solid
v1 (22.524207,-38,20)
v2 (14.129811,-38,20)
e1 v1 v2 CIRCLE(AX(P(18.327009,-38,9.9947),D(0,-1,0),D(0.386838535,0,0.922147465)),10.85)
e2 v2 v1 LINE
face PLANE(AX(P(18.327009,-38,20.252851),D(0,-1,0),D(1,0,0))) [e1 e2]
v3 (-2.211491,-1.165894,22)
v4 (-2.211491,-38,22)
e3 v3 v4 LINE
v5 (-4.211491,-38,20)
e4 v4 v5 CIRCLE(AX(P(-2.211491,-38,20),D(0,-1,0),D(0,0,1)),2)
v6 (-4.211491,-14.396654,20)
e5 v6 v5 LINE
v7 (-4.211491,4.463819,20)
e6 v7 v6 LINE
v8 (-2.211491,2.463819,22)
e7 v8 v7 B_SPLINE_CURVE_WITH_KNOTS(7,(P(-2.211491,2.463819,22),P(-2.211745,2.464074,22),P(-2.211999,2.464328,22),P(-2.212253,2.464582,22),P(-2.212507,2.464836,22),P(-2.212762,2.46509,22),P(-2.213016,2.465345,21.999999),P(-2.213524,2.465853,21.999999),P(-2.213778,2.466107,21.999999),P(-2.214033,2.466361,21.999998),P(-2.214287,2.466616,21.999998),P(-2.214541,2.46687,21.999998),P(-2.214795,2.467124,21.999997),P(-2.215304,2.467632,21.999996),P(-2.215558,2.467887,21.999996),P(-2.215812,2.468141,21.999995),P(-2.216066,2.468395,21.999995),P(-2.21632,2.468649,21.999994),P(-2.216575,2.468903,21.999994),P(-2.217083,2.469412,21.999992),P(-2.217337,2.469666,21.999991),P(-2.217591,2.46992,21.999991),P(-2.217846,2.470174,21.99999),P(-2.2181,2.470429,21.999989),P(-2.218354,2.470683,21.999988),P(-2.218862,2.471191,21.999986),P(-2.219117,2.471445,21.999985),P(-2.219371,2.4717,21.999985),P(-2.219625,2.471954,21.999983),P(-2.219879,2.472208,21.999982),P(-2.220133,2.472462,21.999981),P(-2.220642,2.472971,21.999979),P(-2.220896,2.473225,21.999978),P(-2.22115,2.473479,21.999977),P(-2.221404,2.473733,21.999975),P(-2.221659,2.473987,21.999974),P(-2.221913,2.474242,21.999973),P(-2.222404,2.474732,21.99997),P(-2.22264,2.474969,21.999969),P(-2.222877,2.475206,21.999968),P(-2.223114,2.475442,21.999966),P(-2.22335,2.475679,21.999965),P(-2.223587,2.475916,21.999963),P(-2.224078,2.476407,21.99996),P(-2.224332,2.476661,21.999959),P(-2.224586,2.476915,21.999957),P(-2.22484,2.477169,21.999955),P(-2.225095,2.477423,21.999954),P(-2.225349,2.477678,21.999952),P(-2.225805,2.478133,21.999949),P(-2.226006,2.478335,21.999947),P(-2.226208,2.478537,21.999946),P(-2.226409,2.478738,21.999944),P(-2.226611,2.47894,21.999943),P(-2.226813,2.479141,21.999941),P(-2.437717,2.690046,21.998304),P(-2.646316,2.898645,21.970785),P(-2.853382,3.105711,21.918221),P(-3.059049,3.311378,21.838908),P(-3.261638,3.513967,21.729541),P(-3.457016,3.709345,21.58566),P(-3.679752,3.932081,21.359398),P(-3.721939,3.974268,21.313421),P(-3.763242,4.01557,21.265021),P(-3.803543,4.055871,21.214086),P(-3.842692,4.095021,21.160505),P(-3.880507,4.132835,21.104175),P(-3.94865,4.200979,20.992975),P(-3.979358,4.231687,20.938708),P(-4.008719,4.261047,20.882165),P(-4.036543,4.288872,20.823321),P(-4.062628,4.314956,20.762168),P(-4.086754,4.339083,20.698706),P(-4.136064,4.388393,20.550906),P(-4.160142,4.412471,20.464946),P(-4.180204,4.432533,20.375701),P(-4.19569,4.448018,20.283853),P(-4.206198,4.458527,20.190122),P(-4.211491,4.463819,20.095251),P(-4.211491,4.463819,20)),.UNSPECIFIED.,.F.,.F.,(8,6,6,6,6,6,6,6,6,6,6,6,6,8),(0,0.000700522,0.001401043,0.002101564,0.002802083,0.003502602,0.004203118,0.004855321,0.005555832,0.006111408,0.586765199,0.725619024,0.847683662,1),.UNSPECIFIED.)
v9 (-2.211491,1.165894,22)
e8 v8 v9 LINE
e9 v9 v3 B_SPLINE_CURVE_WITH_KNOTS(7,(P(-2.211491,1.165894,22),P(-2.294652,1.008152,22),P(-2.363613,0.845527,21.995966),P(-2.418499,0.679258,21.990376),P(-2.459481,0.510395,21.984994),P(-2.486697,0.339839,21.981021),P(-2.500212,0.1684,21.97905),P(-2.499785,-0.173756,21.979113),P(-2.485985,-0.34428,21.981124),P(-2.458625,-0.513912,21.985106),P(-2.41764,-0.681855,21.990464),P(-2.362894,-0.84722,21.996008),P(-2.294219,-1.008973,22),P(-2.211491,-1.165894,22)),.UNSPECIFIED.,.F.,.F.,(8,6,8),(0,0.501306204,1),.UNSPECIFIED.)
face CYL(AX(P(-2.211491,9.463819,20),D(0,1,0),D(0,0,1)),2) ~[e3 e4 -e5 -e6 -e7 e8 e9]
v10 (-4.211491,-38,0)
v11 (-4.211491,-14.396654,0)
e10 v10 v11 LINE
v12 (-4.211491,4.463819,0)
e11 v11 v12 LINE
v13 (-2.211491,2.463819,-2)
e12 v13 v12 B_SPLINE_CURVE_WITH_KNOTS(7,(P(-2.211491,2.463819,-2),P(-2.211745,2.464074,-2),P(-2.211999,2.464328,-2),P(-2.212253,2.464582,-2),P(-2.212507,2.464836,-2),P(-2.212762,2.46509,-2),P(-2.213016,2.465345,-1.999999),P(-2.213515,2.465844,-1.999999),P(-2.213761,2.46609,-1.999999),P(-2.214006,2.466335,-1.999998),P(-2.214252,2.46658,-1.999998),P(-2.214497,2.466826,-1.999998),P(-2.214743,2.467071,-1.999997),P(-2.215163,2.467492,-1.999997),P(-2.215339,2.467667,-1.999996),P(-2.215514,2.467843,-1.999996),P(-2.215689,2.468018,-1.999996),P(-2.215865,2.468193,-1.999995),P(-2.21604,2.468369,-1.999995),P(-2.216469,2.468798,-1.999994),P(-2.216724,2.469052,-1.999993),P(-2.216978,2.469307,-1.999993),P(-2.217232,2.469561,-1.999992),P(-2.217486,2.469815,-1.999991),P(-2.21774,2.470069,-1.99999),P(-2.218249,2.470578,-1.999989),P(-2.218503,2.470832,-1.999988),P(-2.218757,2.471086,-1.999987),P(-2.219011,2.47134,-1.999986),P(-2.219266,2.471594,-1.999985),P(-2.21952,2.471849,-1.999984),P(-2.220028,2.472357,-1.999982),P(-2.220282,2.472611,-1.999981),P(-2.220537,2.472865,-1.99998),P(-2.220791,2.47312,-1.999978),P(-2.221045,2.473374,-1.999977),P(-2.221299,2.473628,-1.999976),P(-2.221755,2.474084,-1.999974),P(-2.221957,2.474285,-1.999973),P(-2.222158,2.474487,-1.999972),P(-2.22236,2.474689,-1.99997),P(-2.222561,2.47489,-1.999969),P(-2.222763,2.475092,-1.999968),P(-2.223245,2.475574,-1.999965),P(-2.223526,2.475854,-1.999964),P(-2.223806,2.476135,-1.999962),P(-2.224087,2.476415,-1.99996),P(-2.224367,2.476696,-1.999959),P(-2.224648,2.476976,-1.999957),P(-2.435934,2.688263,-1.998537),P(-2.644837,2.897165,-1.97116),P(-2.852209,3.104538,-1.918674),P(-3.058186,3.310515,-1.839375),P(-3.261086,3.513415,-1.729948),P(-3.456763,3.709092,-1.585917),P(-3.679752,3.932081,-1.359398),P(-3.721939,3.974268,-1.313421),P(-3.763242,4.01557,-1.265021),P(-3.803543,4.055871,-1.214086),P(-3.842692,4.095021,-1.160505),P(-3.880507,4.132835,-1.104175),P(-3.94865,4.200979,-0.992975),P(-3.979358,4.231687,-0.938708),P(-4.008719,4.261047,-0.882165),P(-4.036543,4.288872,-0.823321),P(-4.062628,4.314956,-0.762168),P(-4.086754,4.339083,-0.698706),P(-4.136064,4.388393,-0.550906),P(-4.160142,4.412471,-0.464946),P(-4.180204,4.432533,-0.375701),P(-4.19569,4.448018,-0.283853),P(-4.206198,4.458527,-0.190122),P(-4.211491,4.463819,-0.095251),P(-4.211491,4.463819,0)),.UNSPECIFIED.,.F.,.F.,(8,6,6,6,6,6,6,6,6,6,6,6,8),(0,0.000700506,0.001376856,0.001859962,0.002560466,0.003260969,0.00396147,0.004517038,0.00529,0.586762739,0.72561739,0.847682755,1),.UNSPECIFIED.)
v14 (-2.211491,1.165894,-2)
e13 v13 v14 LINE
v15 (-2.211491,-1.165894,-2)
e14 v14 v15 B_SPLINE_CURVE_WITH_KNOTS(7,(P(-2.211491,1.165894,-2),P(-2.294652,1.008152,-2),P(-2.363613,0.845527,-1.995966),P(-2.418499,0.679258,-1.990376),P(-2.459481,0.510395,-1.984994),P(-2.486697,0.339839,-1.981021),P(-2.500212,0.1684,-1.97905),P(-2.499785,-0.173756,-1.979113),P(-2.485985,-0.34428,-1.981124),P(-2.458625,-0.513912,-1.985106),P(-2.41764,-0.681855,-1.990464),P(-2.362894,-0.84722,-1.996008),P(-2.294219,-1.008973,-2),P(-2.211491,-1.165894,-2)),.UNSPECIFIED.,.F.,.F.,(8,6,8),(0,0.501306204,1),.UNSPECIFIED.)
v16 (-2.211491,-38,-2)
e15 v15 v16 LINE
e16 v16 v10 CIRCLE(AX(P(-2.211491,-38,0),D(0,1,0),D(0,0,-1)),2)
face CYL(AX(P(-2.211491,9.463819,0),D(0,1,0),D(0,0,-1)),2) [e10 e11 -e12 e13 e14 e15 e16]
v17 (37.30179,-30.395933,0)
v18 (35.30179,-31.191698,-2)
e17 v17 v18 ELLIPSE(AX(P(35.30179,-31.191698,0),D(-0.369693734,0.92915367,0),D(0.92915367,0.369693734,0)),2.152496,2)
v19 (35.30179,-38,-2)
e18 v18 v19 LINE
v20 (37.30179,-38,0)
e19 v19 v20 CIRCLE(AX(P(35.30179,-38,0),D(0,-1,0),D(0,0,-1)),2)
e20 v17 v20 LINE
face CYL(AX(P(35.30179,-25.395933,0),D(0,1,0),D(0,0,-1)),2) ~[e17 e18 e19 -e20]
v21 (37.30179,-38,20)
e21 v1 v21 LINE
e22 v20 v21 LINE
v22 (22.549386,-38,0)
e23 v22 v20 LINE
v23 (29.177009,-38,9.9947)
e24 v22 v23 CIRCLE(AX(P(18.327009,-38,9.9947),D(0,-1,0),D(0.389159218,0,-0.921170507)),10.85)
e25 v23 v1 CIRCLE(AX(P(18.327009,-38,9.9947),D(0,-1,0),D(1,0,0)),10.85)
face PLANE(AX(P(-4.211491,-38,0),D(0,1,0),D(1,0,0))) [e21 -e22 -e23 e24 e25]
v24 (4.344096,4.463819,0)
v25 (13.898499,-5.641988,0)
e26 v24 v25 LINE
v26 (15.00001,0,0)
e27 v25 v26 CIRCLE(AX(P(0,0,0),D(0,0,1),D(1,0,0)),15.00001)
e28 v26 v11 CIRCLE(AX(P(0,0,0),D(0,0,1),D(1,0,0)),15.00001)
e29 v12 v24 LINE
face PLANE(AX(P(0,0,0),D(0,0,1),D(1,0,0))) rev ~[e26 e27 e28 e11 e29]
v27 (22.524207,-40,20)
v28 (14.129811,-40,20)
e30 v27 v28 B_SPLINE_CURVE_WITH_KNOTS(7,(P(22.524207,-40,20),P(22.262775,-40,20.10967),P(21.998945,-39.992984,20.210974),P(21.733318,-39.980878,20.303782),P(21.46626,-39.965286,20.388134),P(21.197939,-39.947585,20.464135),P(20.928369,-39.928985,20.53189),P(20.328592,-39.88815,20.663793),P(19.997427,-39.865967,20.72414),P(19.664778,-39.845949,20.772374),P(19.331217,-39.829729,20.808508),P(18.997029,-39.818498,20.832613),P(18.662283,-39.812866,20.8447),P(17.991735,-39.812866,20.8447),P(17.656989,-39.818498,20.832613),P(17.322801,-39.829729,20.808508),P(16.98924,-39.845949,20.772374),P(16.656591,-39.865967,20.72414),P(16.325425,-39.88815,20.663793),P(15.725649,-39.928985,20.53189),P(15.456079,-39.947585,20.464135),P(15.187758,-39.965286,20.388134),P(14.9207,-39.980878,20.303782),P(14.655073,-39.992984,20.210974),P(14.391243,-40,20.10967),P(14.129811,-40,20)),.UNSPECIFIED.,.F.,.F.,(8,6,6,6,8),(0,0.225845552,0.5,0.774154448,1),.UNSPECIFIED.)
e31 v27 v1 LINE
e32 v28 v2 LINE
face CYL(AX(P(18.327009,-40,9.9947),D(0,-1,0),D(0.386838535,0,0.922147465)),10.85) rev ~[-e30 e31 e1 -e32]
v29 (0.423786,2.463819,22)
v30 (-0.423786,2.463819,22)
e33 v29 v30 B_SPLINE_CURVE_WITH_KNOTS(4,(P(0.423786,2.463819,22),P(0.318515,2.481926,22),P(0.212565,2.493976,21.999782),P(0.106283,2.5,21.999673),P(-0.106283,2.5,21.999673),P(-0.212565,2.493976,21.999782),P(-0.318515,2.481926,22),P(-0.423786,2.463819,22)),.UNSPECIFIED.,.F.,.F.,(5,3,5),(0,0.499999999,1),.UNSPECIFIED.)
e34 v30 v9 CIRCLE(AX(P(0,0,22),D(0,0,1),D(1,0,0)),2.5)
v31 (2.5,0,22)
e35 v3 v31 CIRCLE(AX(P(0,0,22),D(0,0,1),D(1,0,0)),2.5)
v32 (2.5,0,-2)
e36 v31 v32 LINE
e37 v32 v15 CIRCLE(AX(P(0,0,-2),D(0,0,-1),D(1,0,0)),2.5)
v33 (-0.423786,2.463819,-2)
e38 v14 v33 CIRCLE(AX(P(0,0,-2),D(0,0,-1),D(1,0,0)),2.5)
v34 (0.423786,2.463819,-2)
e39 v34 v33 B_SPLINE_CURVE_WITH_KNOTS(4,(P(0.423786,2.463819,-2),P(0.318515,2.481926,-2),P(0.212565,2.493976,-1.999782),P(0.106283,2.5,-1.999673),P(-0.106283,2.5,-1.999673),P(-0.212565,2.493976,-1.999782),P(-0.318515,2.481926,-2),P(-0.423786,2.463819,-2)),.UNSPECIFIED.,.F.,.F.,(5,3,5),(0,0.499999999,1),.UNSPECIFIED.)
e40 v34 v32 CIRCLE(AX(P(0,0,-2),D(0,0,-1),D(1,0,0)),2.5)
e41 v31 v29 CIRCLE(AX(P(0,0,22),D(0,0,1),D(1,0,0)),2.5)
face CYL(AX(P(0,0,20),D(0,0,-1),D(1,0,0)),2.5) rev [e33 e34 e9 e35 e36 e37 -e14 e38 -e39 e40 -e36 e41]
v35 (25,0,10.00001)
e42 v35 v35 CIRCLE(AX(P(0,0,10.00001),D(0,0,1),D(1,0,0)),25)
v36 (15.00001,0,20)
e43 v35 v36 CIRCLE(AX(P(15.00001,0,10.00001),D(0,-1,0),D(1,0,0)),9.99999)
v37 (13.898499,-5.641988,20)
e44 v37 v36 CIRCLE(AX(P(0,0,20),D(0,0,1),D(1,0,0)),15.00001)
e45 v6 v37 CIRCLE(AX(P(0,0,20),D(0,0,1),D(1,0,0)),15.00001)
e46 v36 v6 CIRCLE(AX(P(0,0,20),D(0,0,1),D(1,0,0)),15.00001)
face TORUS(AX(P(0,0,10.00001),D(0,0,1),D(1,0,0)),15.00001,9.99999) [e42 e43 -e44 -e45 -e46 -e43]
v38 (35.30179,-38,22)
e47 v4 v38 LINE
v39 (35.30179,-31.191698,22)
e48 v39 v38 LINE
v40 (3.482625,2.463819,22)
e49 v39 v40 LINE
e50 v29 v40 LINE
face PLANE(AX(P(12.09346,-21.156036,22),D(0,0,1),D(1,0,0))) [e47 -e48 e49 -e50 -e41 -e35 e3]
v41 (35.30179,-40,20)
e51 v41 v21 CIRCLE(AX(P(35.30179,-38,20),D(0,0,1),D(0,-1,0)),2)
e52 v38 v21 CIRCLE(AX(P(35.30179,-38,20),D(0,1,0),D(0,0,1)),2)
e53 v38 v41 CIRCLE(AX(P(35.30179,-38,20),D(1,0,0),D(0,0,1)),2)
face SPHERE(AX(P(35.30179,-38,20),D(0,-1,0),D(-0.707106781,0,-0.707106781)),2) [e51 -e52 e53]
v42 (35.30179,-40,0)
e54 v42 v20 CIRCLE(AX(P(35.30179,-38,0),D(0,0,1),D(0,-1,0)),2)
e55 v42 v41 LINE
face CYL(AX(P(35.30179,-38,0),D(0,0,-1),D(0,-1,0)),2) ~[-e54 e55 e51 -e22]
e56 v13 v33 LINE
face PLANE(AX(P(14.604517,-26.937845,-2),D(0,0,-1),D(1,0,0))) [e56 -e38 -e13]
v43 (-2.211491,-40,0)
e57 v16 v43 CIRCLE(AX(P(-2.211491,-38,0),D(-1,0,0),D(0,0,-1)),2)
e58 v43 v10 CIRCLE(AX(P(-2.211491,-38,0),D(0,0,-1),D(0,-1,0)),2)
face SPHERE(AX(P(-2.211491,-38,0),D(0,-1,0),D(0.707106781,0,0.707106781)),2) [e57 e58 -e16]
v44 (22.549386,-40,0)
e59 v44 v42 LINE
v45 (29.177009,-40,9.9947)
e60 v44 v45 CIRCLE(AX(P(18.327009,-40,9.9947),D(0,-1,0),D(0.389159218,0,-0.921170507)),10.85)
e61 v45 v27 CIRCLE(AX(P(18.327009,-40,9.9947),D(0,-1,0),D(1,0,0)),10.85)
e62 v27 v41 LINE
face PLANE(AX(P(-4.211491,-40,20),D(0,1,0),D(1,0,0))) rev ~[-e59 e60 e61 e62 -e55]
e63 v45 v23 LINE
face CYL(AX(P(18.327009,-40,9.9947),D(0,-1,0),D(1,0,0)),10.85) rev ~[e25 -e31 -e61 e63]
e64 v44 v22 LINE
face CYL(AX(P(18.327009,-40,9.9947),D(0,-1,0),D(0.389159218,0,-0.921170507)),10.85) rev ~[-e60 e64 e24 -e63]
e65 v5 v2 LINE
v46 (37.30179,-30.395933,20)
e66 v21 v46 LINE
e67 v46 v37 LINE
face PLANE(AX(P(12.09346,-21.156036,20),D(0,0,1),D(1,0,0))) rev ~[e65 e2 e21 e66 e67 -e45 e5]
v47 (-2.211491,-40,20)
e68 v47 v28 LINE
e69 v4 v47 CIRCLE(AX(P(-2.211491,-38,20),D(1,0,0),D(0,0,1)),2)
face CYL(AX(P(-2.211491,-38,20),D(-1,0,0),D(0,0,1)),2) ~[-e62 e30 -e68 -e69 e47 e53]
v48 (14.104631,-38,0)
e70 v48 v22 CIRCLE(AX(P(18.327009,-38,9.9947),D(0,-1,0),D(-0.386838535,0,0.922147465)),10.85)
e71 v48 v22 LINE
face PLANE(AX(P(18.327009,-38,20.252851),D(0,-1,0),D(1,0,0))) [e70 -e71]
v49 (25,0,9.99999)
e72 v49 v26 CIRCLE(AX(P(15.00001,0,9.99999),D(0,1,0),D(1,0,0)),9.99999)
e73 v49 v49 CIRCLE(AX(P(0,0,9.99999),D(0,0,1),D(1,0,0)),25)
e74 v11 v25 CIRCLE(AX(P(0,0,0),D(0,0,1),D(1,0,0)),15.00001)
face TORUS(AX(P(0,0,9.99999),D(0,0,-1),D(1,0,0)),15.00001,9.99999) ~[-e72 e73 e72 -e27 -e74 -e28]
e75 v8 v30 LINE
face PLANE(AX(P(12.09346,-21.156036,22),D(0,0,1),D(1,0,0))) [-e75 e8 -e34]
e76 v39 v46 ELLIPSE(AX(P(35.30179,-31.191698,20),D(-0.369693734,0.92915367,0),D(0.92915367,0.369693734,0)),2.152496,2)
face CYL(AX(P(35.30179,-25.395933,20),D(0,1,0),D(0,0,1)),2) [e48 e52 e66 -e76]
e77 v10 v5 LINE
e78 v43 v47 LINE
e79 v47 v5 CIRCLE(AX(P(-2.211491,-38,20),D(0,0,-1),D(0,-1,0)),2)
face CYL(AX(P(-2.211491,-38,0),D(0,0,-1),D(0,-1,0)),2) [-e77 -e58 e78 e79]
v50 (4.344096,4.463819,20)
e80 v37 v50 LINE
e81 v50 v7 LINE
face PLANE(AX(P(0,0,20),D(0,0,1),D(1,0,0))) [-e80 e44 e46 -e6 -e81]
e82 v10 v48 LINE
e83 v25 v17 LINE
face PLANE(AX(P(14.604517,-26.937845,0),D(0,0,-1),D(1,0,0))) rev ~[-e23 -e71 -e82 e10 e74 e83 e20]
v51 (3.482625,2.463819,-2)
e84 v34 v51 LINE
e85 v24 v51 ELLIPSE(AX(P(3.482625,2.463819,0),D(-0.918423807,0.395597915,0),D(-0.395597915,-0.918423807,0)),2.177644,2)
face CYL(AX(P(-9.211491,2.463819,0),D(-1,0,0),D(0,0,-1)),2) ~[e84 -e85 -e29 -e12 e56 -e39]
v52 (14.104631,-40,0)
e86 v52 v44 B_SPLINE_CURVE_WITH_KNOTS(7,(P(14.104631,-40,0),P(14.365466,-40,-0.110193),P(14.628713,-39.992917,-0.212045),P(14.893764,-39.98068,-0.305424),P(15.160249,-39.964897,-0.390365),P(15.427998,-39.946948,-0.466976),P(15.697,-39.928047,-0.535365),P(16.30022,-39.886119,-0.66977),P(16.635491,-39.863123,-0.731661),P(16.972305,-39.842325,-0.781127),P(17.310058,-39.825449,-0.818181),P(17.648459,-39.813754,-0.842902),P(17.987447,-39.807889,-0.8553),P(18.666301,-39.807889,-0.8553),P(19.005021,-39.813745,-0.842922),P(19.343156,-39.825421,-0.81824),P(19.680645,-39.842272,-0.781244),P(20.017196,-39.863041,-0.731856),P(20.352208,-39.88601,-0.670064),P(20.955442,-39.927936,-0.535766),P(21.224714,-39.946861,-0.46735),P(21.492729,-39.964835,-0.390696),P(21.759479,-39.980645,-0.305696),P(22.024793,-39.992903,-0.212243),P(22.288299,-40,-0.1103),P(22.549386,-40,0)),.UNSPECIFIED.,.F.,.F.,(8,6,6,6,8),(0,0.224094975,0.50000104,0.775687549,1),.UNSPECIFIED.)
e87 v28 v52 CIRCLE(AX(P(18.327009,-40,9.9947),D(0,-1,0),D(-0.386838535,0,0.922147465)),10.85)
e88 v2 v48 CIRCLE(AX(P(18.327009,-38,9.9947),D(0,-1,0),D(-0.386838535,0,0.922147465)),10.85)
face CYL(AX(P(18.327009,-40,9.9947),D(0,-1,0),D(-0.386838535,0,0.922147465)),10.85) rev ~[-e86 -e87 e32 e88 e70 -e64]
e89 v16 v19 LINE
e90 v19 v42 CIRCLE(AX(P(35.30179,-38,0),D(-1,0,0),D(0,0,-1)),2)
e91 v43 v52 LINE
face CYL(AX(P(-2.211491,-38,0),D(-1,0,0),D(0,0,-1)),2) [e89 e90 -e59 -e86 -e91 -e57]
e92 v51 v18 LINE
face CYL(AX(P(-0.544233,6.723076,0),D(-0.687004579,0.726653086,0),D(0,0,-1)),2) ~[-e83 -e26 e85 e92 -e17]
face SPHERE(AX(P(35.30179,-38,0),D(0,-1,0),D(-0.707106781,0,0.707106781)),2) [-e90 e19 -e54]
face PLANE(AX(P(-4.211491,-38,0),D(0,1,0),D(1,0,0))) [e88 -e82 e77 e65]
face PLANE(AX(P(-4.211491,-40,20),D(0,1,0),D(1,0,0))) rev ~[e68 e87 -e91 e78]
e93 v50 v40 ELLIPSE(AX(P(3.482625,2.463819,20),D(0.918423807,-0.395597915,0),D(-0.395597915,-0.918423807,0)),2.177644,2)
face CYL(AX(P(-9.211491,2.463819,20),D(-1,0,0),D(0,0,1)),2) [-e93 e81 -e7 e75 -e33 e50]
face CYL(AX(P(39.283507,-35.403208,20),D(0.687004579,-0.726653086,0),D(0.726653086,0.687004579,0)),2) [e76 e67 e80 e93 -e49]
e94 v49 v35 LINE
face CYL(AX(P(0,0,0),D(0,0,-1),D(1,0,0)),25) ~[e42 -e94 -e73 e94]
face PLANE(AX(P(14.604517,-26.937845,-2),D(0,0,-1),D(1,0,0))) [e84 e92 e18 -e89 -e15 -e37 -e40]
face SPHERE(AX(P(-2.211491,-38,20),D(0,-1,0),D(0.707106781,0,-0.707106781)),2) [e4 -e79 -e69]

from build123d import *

# Parameters (mm, degrees)
F0_R          = 25
F1_DEPTH      = 20
F2_R          = 9.99999
F3_R          = 2.5
F4_DEPTH      = 25.4
F5_R          = 2.5
F6_DEPTH      = 2
F7_W          = 41.5132804774
F7_H          = 2
F8_DEPTH      = 20
F9_R          = 2.5
F9_W          = 41.5132804774
F9_H          = 2
F10_DEPTH     = 2
F11_T1_DEPTH  = 20
F11_T3_DEPTH  = 47.4638193212
F11_T5_DEPTH  = 37.5132804774
F11_T7_DEPTH  = 12.6040666103
F11_T9_DEPTH  = 57.9730332998
F11_T11_DEPTH = 18.5555869155
F11_T13_DEPTH = 57.9730332998
F11_S17_W     = 2
F11_S17_H     = 2
F11_T18_DEPTH = 2
F11_S23_W     = 2
F11_S23_H     = 2
F11_T24_DEPTH = 2
F11_S29_W     = 2
F11_S29_H     = 2
F11_T30_DEPTH = 2
F11_S35_W     = 2
F11_S35_H     = 2
F11_T36_DEPTH = 2
F13_DEPTH     = 2


# Not quite as in the source:
# - a fillet or chamfer that OpenCascade refuses, or shapes differently, is made with other operations: its cross-section is extruded or revolved along the edge and cut away or added
# - a fillet or chamfer is up to 0.001 mm smaller than in the source, because OpenCascade refuses the exact size


with BuildPart() as f1:
    # F0 (on Top) → F1 (new body)
    with BuildSketch(Plane.XY):
        Circle(F0_R)
    extrude(amount=F1_DEPTH)

    # F2 (radius 10 in the source; OpenCascade refuses exactly that, so slightly less here)
    f2_edges = [f1.edges().sort_by_distance(p)[0] for p in [
        (-25, 0, 20),
        (-25, 0, 0),
    ]]
    fillet(f2_edges, radius=F2_R)

    # F3 (on face) → F4 (cut)
    with BuildSketch(Plane.XY.offset(20)):
        Circle(F3_R)
    extrude(amount=-F4_DEPTH, mode=Mode.SUBTRACT)

    # F5 (on face) → F6 (join)
    with BuildSketch(Plane(origin=(0, 0, 0), x_dir=(1, 0, 0), z_dir=(0, 0, -1))):
        with BuildLine():
            Line((37.3017899692, 30.3959333897), (37.3017899692, 40))
            Line((37.3017899692, 40), (-4.2114905082, 40))
            Line((-4.2114905082, 40), (-4.2114905082, 14.3966540453))
            ThreePointArc((-4.2114905082, 14.3966540453), (6.5284436355, 13.5048037268), (13.8984988304, 5.641988148))
            Line((13.8984988304, 5.641988148), (37.3017899692, 30.3959333897))
        make_face()
        with BuildLine():
            Line((4.3440964073, -4.4638193212), (13.8984988304, 5.641988148))
            ThreePointArc((13.8984988304, 5.641988148), (6.5284436355, 13.5048037268), (-4.2114905082, 14.3966540453))
            Line((-4.2114905082, 14.3966540453), (-4.2114905082, -4.4638193212))
            Line((-4.2114905082, -4.4638193212), (4.3440964073, -4.4638193212))
        make_face()
        Circle(F5_R, mode=Mode.SUBTRACT)
    extrude(amount=F6_DEPTH)

    # F7 (on face) → F8 (join)
    with BuildSketch(Plane.XY):
        with Locations((16.5451497305, -39)):
            Rectangle(F7_W, F7_H)
    extrude(amount=F8_DEPTH)

    # F9 (on face) → F10 (join)
    with BuildSketch(Plane.XY.offset(20)):
        Polygon((37.3017899692, -38), (37.3017899692, -30.3959333897), (4.3440964073, 4.4638193212), (-4.2114905082, 4.4638193212), (-4.2114905082, -38), align=None)
        Circle(F9_R, mode=Mode.SUBTRACT)
        with Locations((16.5451497305, -39)):
            Rectangle(F9_W, F9_H)
    extrude(amount=F10_DEPTH)

    # F11: fillet of radius 2 on 12 edges, made by hand

    # F11_s2 → F11_t1 (cut)
    with BuildSketch(Plane.XY):
        with BuildLine():
            ThreePointArc((-2.2114905082, -40), (-3.6257040705, -39.4142135624), (-4.2114905082, -38))
            Line((-4.2114905082, -38), (-4.2114905082, -40))
            Line((-4.2114905082, -40), (-2.2114905082, -40))
        make_face()
        with BuildLine():
            ThreePointArc((35.3017899692, -40), (36.7160035316, -39.4142135624), (37.3017899692, -38))
            Line((37.3017899692, -38), (37.3017899692, -40))
            Line((37.3017899692, -40), (35.3017899692, -40))
        make_face()
    extrude(amount=F11_T1_DEPTH, mode=Mode.SUBTRACT)

    # F11_s4 → F11_t3 (cut)
    with BuildSketch(Plane.XZ.offset(-9.4638193212)):
        with BuildLine():
            ThreePointArc((-2.2114905082, 22), (-3.6257040705, 21.4142135624), (-4.2114905082, 20))
            Line((-4.2114905082, 20), (-4.2114905082, 22))
            Line((-4.2114905082, 22), (-2.2114905082, 22))
        make_face()
        with BuildLine():
            ThreePointArc((-2.2114905082, -2), (-3.6257040705, -1.4142135624), (-4.2114905082, 0))
            Line((-4.2114905082, 0), (-4.2114905082, -2))
            Line((-4.2114905082, -2), (-2.2114905082, -2))
        make_face()
    extrude(amount=F11_T3_DEPTH, mode=Mode.SUBTRACT)

    # F11_s6 → F11_t5 (cut)
    with BuildSketch(Plane.YZ.offset(-2.2114905082)):
        with BuildLine():
            ThreePointArc((-38, 22), (-39.4142135624, 21.4142135624), (-40, 20))
            Line((-40, 20), (-40, 22))
            Line((-40, 22), (-38, 22))
        make_face()
        with BuildLine():
            ThreePointArc((-38, -2), (-39.4142135624, -1.4142135624), (-40, 0))
            Line((-40, 0), (-40, -2))
            Line((-40, -2), (-38, -2))
        make_face()
    extrude(amount=F11_T5_DEPTH, mode=Mode.SUBTRACT)

    # F11_s8 → F11_t7 (cut)
    with BuildSketch(Plane.XZ.offset(25.3959333897)):
        with BuildLine():
            ThreePointArc((35.3017899692, 22), (36.7160035316, 21.4142135624), (37.3017899692, 20))
            Line((37.3017899692, 20), (37.3017899692, 22))
            Line((37.3017899692, 22), (35.3017899692, 22))
        make_face()
        with BuildLine():
            ThreePointArc((35.3017899692, -2), (36.7160035316, -1.4142135624), (37.3017899692, 0))
            Line((37.3017899692, 0), (37.3017899692, -2))
            Line((37.3017899692, -2), (35.3017899692, -2))
        make_face()
    extrude(amount=F11_T7_DEPTH, mode=Mode.SUBTRACT)

    # F11_s10 → F11_t9 (cut)
    with BuildSketch(Plane(origin=(36.2146215396, -38.3046449843, 0), x_dir=(0, 0, 1), z_dir=(-0.6870045793, 0.7266530864, 0))):
        with BuildLine():
            ThreePointArc((20, 6.223315377), (21.4142135624, 5.6375289394), (22, 4.223315377))
            Line((22, 4.223315377), (22, 6.223315377))
            Line((22, 6.223315377), (20, 6.223315377))
        make_face()
    extrude(amount=F11_T9_DEPTH, mode=Mode.SUBTRACT)

    # F11_s12 → F11_t11 (cut)
    with BuildSketch(Plane.YZ.offset(-9.2114905082)):
        with BuildLine():
            ThreePointArc((2.4638193212, 22), (3.8780328836, 21.4142135624), (4.4638193212, 20))
            Line((4.4638193212, 20), (4.4638193212, 22))
            Line((4.4638193212, 22), (2.4638193212, 22))
        make_face()
        with BuildLine():
            ThreePointArc((2.4638193212, -2), (3.8780328836, -1.4142135624), (4.4638193212, 0))
            Line((4.4638193212, 0), (4.4638193212, -2))
            Line((4.4638193212, -2), (2.4638193212, -2))
        make_face()
    extrude(amount=F11_T11_DEPTH, mode=Mode.SUBTRACT)

    # F11_s14 → F11_t13 (cut)
    with BuildSketch(Plane(origin=(-3.6131178157, 3.8216385905, 0), x_dir=(0, 0, 1), z_dir=(0.6870045793, -0.7266530864, 0))):
        with BuildLine():
            ThreePointArc((-2, -4.223315377), (-1.4142135624, -5.6375289394), (0, -6.223315377))
            Line((0, -6.223315377), (-2, -6.223315377))
            Line((-2, -6.223315377), (-2, -4.223315377))
        make_face()
    extrude(amount=F11_T13_DEPTH, mode=Mode.SUBTRACT)


with BuildPart() as f11_tool16:
    # F11_s17 → F11_t18 (new body)
    with BuildSketch(Plane.XZ.offset(38)):
        with Locations((-3.2114905082, -1)):
            Rectangle(F11_S17_W, F11_S17_H)
    extrude(amount=F11_T18_DEPTH)

    # F11_s19 → F11_t20 (revolve, cut)
    with BuildSketch(Plane(origin=(-2.2114905082, -38, 0), x_dir=(0.7071067812, 0, 0.7071067812), z_dir=(0.7071067812, 0, -0.7071067812))):
        with BuildLine():
            ThreePointArc((0, -2), (2, 0), (0, 2))
            Line((0, 2), (0, -2))
        make_face()
    revolve(axis=Axis((-2.2114905082, -38, 0), (0, -1, 0)), mode=Mode.SUBTRACT)


with BuildPart() as f1_1:
    add(f1.part)

    # F11_t15: cut F11_tool16
    add(f11_tool16.part, mode=Mode.SUBTRACT)


with BuildPart() as f11_tool22:
    # F11_s23 → F11_t24 (new body)
    with BuildSketch(Plane.XZ.offset(38)):
        with Locations((-3.2114905082, 21)):
            Rectangle(F11_S23_W, F11_S23_H)
    extrude(amount=F11_T24_DEPTH)

    # F11_s25 → F11_t26 (revolve, cut)
    with BuildSketch(Plane(origin=(-2.2114905082, -38, 20), x_dir=(0.7071067812, 0, -0.7071067812), z_dir=(-0.7071067812, 0, -0.7071067812))):
        with BuildLine():
            ThreePointArc((0, -2), (2, 0), (0, 2))
            Line((0, 2), (0, -2))
        make_face()
    revolve(axis=Axis((-2.2114905082, -38, 20), (0, -1, 0)), mode=Mode.SUBTRACT)


with BuildPart() as f1_2:
    add(f1_1.part)

    # F11_t21: cut F11_tool22
    add(f11_tool22.part, mode=Mode.SUBTRACT)


with BuildPart() as f11_tool28:
    # F11_s29 → F11_t30 (new body)
    with BuildSketch(Plane.XZ.offset(38)):
        with Locations((36.3017899692, 21)):
            Rectangle(F11_S29_W, F11_S29_H)
    extrude(amount=F11_T30_DEPTH)

    # F11_s31 → F11_t32 (revolve, cut)
    with BuildSketch(Plane(origin=(35.3017899692, -38, 20), x_dir=(-0.7071067812, 0, -0.7071067812), z_dir=(-0.7071067812, 0, 0.7071067812))):
        with BuildLine():
            ThreePointArc((0, -2), (2, 0), (0, 2))
            Line((0, 2), (0, -2))
        make_face()
    revolve(axis=Axis((35.3017899692, -38, 20), (0, -1, 0)), mode=Mode.SUBTRACT)


with BuildPart() as f1_3:
    add(f1_2.part)

    # F11_t27: cut F11_tool28
    add(f11_tool28.part, mode=Mode.SUBTRACT)


with BuildPart() as f11_tool34:
    # F11_s35 → F11_t36 (new body)
    with BuildSketch(Plane.XZ.offset(38)):
        with Locations((36.3017899692, -1)):
            Rectangle(F11_S35_W, F11_S35_H)
    extrude(amount=F11_T36_DEPTH)

    # F11_s37 → F11_t38 (revolve, cut)
    with BuildSketch(Plane(origin=(35.3017899692, -38, 0), x_dir=(-0.7071067812, 0, 0.7071067812), z_dir=(0.7071067812, 0, 0.7071067812))):
        with BuildLine():
            ThreePointArc((0, -2), (2, 0), (0, 2))
            Line((0, 2), (0, -2))
        make_face()
    revolve(axis=Axis((35.3017899692, -38, 0), (0, -1, 0)), mode=Mode.SUBTRACT)


with BuildPart() as f1_4:
    add(f1_3.part)

    # F11_t33: cut F11_tool34
    add(f11_tool34.part, mode=Mode.SUBTRACT)

    # F12 (on face) → F13 (cut)
    with BuildSketch(Plane.XZ.offset(40)):
        with BuildLine():
            Line((14.1298108305, 20), (22.5242070351, 20))
            ThreePointArc((22.5242070351, 20), (18.3270089328, 20.8447), (14.1298108305, 20))
        make_face()
        with BuildLine():
            ThreePointArc((22.5493864515, 0), (27.3695554789, 3.9984635169), (29.1770089328, 9.9947))
            ThreePointArc((29.1770089328, 9.9947), (27.3619992319, 16.0023160243), (22.5242070351, 20))
            Line((22.5242070351, 20), (14.1298108305, 20))
            ThreePointArc((14.1298108305, 20), (7.4770175315, 10.0083598225), (14.1046314142, 0))
            Line((14.1046314142, 0), (22.5493864515, 0))
        make_face()
        with BuildLine():
            ThreePointArc((14.1046314142, 0), (18.3270089328, -0.8553), (22.5493864515, 0))
            Line((22.5493864515, 0), (14.1046314142, 0))
        make_face()
    extrude(amount=-F13_DEPTH, mode=Mode.SUBTRACT)


solid = f1_4.part
